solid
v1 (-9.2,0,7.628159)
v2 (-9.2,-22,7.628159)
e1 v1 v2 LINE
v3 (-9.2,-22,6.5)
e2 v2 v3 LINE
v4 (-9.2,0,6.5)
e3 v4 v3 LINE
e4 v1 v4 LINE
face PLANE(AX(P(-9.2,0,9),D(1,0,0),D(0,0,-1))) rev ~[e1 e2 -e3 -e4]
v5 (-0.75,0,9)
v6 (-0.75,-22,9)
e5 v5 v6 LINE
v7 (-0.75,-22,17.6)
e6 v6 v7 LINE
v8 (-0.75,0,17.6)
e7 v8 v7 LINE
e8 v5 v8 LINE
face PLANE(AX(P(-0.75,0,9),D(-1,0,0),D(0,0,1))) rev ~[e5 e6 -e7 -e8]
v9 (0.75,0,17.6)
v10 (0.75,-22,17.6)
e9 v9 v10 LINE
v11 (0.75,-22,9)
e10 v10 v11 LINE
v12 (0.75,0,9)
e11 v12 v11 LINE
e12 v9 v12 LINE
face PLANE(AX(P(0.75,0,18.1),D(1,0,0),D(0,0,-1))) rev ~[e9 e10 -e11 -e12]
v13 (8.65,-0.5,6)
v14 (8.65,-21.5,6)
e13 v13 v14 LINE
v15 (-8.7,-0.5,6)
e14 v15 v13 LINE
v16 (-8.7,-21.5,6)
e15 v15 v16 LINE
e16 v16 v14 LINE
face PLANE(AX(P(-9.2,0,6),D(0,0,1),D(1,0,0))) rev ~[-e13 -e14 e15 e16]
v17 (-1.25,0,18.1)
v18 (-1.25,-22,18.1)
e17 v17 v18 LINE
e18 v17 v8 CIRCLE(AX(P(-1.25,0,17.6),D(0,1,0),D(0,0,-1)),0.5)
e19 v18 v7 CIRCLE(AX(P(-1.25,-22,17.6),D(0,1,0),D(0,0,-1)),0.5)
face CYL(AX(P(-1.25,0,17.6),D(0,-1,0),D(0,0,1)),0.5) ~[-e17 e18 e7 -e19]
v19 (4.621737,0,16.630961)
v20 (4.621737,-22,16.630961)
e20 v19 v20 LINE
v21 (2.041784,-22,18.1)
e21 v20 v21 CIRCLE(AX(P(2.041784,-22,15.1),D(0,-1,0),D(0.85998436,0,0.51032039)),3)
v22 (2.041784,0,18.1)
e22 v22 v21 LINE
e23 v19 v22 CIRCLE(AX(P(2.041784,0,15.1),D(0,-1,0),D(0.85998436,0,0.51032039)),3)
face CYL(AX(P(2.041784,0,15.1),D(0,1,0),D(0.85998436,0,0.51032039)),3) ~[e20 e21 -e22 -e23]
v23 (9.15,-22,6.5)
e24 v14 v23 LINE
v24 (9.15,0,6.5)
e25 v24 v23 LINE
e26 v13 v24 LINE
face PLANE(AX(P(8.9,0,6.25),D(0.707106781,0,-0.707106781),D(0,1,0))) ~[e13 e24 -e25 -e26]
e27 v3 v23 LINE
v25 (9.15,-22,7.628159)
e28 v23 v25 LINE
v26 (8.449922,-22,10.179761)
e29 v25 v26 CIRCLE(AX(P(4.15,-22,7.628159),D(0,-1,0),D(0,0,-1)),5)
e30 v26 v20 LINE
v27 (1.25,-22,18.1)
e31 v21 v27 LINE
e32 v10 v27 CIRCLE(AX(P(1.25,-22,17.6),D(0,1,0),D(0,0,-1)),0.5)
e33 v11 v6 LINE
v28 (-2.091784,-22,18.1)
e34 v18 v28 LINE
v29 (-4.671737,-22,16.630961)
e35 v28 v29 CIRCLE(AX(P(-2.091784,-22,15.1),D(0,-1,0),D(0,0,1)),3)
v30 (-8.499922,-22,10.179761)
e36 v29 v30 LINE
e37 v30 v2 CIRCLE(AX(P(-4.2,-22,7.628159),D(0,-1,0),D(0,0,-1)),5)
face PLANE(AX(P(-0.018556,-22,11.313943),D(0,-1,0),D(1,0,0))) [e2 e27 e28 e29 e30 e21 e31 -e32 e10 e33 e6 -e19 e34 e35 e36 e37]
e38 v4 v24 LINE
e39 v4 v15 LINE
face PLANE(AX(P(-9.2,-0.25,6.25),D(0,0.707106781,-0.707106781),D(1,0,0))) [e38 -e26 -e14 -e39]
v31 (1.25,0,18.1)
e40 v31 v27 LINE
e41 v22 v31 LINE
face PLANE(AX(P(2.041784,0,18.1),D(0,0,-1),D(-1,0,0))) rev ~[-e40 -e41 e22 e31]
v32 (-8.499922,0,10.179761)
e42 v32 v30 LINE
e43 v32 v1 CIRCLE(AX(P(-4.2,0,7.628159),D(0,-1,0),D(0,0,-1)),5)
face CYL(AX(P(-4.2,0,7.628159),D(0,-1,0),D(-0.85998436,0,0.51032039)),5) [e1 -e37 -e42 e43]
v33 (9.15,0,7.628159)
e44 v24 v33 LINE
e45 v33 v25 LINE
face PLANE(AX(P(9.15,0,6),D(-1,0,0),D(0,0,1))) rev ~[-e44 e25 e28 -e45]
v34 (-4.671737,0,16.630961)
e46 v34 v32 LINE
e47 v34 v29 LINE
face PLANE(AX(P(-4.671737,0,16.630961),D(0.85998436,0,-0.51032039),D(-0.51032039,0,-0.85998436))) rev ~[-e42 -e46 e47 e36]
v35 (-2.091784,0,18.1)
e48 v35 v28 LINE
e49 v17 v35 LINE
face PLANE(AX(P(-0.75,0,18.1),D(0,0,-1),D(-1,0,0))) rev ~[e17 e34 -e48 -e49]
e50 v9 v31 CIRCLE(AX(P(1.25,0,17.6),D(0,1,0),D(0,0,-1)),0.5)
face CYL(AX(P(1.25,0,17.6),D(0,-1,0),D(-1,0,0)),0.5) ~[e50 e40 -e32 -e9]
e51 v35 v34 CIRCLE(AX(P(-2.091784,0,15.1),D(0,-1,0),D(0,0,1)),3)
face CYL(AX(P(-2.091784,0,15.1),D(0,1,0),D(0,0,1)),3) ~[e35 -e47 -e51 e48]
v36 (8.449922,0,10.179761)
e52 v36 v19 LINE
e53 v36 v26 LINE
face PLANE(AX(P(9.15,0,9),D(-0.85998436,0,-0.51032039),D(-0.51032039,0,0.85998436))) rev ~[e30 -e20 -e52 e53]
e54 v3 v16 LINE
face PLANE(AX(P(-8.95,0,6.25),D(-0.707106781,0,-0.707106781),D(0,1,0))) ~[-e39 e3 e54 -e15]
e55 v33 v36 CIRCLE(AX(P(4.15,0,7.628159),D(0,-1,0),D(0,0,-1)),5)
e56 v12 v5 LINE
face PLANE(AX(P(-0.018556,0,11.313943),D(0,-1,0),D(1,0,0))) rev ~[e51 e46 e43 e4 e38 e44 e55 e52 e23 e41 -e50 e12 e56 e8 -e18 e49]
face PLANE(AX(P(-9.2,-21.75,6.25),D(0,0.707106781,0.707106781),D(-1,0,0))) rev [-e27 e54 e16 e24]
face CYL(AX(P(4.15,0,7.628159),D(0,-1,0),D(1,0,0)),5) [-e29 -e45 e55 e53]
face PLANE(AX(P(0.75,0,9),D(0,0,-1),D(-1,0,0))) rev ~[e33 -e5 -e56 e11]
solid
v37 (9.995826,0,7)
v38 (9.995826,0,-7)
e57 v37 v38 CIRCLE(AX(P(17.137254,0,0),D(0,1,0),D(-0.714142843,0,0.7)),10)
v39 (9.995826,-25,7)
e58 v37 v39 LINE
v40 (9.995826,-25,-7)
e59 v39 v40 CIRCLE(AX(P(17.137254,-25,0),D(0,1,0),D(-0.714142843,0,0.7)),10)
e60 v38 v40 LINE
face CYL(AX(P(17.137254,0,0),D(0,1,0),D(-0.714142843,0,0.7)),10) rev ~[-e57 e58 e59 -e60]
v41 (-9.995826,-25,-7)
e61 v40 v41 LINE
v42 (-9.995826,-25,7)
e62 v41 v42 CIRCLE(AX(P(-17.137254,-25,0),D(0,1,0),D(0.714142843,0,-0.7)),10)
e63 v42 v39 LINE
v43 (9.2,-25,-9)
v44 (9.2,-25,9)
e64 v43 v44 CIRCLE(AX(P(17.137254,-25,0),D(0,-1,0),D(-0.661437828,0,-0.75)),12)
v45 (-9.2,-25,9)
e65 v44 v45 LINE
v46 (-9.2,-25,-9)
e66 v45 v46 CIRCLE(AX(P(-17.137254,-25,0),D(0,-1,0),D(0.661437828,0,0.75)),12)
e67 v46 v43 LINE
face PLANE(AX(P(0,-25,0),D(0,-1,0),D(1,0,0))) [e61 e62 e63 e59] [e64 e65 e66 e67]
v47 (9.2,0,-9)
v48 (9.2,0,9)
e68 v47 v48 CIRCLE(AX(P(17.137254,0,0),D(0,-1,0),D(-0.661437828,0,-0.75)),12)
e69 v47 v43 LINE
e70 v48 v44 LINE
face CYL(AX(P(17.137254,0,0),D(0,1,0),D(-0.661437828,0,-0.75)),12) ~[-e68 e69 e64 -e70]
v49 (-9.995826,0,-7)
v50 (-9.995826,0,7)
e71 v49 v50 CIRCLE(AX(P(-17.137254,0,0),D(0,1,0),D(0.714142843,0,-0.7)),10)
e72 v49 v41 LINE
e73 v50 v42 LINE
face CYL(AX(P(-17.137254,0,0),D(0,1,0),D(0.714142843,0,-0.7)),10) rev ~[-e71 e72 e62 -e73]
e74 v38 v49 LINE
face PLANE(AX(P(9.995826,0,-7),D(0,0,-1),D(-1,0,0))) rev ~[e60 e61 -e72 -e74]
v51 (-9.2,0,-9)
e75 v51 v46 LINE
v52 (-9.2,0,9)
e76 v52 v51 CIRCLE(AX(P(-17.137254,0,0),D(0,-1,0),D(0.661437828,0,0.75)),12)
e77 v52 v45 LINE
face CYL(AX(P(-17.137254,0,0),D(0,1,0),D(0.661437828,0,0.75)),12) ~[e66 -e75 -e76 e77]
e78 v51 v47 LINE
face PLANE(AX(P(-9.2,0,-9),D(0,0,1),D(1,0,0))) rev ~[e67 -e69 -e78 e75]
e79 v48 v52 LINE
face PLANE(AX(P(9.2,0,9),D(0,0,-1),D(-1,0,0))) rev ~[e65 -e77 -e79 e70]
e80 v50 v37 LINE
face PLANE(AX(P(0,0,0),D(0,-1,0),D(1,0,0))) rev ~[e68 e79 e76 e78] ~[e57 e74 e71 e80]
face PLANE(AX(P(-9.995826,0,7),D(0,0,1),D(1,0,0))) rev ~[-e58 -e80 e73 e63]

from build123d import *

# Parameters (mm, degrees)
F2_DEPTH = 25
F4_DEPTH = 22
F5_R     = 5
F6_R     = 0.5
F7_SIZE  = 0.5


# Not quite as in the source:
# - a feature of the source that left no trace in its solid (it failed there, or was rolled back) is left out


with BuildPart() as f2:
    # F1 (on Front) → F2 (new body)
    with BuildSketch(Plane.XZ):
        with BuildLine():
            Line((-0.75, 9), (-9.2, 9))
            ThreePointArc((-9.2, 9), (-29.1372539332, 0), (-9.2, -9))
            Line((-9.2, -9), (9.2, -9))
            ThreePointArc((9.2, -9), (29.1372539332, 0), (9.2, 9))
            Line((9.2, 9), (9.15, 9))
            Line((9.15, 9), (0.75, 9))
            Line((0.75, 9), (-0.75, 9))
        make_face()
        with BuildLine():
            Line((9.9958255047, -7), (-9.9958255047, -7))
            ThreePointArc((-9.9958255047, -7), (-27.1372539332, 0), (-9.9958255047, 7))
            Line((-9.9958255047, 7), (9.9958255047, 7))
            ThreePointArc((9.9958255047, 7), (27.1372539332, 0), (9.9958255047, -7))
        make_face(mode=Mode.SUBTRACT)
    extrude(amount=F2_DEPTH)


with BuildPart() as f4:
    # F3 (on Front) → F4 (new body)
    with BuildSketch(Plane.XZ):
        with BuildLine():
            Line((-0.75, 18.1), (-2.0917842475, 18.1))
            ThreePointArc((-2.0917842475, 18.1), (-3.576222945, 17.7069986101), (-4.6717373284, 16.6309611689))
            Line((-4.6717373284, 16.6309611689), (-9.2, 9))
            Line((-9.2, 9), (-9.2, 6))
            Line((-9.2, 6), (9.15, 6))
            Line((9.15, 6), (9.15, 9))
            Line((9.15, 9), (4.6217373284, 16.6309611689))
            ThreePointArc((4.6217373284, 16.6309611689), (3.526222945, 17.7069986101), (2.0417842475, 18.1))
            Line((2.0417842475, 18.1), (0.75, 18.1))
            Line((0.75, 18.1), (0.75, 9))
            Line((0.75, 9), (-0.75, 9))
            Line((-0.75, 9), (-0.75, 18.1))
        make_face()
    extrude(amount=F4_DEPTH)

    # F5
    f5_edges = [f4.edges().sort_by_distance(p)[0] for p in [
        (9.15, -11, 9),
        (-9.2, -11, 9),
    ]]
    fillet(f5_edges, radius=F5_R)

    # F6
    f6_edges = [f4.edges().sort_by_distance(p)[0] for p in [
        (-0.75, -11, 18.1),
        (0.75, -11, 18.1),
    ]]
    fillet(f6_edges, radius=F6_R)

    # F7
    f7_edges = [f4.edges().sort_by_distance(p)[0] for p in [
        (-9.2, -11, 6),
        (9.15, -11, 6),
        (-0.025, 0, 6),
        (-0.025, -22, 6),
    ]]
    chamfer(f7_edges, length=F7_SIZE)


solid = Compound([f2.part, f4.part])
